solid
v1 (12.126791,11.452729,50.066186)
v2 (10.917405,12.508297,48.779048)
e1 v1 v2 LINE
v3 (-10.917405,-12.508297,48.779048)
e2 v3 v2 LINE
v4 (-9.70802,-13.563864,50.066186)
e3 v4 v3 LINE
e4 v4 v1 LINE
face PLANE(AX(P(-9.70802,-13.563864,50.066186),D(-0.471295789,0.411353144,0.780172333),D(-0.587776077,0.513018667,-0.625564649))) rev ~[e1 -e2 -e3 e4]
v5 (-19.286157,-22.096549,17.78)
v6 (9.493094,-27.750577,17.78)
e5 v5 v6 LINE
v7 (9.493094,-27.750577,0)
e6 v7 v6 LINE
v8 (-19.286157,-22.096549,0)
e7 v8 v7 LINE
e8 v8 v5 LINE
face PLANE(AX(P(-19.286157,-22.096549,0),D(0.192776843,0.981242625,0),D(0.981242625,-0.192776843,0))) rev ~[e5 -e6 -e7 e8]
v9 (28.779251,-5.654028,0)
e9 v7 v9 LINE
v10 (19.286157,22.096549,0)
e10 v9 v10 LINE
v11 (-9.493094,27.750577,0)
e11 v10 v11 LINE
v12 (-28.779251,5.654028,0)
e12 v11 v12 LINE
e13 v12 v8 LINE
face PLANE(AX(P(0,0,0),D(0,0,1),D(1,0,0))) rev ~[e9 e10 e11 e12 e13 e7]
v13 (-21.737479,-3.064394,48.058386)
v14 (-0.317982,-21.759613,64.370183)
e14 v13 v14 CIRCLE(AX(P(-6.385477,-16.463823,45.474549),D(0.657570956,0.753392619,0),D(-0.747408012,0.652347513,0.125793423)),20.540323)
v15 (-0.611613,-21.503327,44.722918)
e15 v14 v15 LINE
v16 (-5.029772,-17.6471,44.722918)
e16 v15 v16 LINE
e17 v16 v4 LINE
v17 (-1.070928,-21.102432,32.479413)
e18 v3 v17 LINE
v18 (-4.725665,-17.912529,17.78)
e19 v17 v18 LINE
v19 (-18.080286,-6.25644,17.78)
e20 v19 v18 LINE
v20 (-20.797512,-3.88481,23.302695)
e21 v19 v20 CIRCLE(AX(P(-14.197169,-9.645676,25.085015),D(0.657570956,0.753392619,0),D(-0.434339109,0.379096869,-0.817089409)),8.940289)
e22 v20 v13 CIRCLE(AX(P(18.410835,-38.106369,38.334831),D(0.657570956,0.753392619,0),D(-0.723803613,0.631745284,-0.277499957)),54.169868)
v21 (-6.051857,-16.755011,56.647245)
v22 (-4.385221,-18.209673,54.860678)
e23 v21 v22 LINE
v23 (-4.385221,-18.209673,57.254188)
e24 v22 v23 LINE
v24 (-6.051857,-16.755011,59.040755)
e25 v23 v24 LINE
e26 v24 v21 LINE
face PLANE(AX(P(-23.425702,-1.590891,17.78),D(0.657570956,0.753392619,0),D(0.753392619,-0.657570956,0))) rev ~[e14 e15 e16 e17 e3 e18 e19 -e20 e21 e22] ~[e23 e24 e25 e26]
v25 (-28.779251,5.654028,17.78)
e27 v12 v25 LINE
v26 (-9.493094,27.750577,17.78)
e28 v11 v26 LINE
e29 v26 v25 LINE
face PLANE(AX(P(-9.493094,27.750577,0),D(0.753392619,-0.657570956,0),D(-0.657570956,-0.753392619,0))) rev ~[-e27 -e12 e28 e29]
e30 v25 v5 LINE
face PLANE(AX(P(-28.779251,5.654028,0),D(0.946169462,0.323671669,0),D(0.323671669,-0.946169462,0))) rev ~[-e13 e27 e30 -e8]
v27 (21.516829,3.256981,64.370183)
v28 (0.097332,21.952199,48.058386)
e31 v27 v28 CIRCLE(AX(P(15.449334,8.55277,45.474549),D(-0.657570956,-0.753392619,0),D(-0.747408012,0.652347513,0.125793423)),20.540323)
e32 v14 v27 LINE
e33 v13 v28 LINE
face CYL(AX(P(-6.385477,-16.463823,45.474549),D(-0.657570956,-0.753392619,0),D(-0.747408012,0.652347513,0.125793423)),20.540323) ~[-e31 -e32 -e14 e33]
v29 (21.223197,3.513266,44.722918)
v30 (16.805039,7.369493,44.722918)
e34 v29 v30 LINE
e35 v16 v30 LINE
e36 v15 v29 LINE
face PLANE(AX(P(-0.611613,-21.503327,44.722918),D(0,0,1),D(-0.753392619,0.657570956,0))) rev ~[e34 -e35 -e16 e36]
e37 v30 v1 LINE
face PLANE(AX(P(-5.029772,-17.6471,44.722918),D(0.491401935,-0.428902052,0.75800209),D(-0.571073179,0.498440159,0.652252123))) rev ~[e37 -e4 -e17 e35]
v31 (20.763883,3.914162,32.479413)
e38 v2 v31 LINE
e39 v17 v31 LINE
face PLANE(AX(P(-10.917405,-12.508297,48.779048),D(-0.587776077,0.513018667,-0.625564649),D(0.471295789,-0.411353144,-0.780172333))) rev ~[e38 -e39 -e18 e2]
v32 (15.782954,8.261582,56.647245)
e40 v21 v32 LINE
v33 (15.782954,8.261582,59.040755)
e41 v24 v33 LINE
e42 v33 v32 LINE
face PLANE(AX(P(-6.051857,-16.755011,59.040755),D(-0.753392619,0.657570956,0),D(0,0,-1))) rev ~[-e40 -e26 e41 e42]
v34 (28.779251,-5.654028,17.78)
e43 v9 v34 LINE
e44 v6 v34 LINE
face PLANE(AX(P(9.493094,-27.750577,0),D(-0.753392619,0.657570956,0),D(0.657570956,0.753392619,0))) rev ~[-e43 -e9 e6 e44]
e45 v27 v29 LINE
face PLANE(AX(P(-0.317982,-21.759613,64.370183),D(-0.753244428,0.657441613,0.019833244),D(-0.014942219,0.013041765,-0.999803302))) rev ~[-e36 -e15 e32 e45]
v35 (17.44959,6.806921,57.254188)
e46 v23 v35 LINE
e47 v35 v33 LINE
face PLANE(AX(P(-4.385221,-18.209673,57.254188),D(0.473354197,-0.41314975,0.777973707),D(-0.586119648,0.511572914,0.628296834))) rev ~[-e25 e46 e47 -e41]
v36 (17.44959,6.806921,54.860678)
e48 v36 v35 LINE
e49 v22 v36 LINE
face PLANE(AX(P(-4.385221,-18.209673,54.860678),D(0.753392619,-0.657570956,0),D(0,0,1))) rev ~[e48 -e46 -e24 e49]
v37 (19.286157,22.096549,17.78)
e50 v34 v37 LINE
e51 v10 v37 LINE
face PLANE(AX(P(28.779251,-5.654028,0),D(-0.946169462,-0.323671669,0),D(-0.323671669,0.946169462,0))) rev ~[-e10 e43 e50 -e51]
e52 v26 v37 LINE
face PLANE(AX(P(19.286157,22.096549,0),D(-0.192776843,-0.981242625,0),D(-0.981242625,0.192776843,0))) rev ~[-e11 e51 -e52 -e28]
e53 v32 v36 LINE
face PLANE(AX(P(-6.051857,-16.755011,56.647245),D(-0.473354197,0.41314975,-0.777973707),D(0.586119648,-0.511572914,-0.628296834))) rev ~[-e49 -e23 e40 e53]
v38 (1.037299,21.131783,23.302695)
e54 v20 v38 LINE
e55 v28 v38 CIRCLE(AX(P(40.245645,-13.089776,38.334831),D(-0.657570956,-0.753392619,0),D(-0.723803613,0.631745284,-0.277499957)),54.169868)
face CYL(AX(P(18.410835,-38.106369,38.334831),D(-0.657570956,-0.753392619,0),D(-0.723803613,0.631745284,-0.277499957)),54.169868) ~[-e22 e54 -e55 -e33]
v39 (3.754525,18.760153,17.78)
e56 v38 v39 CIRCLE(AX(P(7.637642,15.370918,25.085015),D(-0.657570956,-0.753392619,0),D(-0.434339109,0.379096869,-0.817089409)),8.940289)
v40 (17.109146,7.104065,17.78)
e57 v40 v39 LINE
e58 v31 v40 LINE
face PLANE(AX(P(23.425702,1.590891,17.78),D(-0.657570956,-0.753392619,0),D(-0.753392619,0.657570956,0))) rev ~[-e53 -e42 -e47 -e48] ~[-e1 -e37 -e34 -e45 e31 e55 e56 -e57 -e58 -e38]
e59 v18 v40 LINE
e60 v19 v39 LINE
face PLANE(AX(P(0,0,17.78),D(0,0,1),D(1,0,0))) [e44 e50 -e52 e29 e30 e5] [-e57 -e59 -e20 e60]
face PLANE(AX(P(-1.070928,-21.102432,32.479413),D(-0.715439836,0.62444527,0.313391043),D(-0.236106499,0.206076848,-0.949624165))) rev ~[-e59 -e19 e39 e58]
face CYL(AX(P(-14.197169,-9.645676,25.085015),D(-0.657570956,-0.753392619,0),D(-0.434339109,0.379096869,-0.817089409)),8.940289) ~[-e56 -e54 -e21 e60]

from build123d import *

# Parameters (mm, degrees)
F1_DEPTH = 17.78
F3_DEPTH = 50.8
F5_DEPTH = 76.2
F7_DEPTH = 177.8
F8_DEPTH = 177.8


# Not quite as in the source:
# - a feature names something its author has since deleted; it is built from what else it names


with BuildPart() as f1:
    # F0 (on Top) → F1 (new body)
    with BuildSketch(Plane.XY):
        Polygon((-9.4930937983, 27.7505766331), (-28.7792512331, 5.6540279267), (-19.2861574348, -22.0965487064), (9.4930937983, -27.7505766331), (28.7792512331, -5.6540279267), (19.2861574348, 22.0965487064), align=None)
    extrude(amount=F1_DEPTH)

    # F2 (on face) → F3 (join)
    with BuildSketch(Plane.XY.offset(17.78)):
        Polygon((-1.5908913392, 23.4257021287), (-23.4257021287, -1.5908913392), (1.5908913392, -23.4257021287), (23.4257021287, 1.5908913392), align=None)
    extrude(amount=F3_DEPTH)

    # F4 (on face) → F5 (cut)
    with BuildSketch(Plane(origin=(-10.9174053947, -12.508296734, 0), x_dir=(0.7533926187, -0.6575709559, 0), z_dir=(-0.6575709559, -0.7533926187, 0))):
        with BuildLine():
            Line((0, 48.7790480256), (13.0695169792, 32.4794128537))
            Line((13.0695169792, 32.4794128537), (8.2184774801, 17.78))
            Line((8.2184774801, 17.78), (16.6026271336, 17.78))
            Line((16.6026271336, 17.78), (16.6026271336, 68.58))
            Line((16.6026271336, 68.58), (-16.6026271336, 68.58))
            Line((-16.6026271336, 68.58), (-16.6026271336, 17.78))
            Line((-16.6026271336, 17.78), (-9.5075005665, 17.78))
            ThreePointArc((-9.5075005665, 17.78), (-11.8387691089, 20.1965691968), (-13.1141533635, 23.3026945488))
            ThreePointArc((-13.1141533635, 23.3026945488), (-15.1729749394, 35.6082188112), (-14.361799588, 48.0583862079))
            ThreePointArc((-14.361799588, 48.0583862079), (-4.2065001242, 63.2907896054), (14.0689240854, 64.3701831512))
            Line((14.0689240854, 64.3701831512), (13.6791784316, 44.722918421))
            Line((13.6791784316, 44.722918421), (7.8148273751, 44.722918421))
            Line((7.8148273751, 44.722918421), (1.6052529907, 50.0661861116))
            Line((1.6052529907, 50.0661861116), (0, 48.7790480256))
        make_face()
    extrude(amount=-F5_DEPTH, mode=Mode.SUBTRACT)

    # F6 (on face) → F7 (cut)
    with BuildSketch(Plane(origin=(-10.9174053947, -12.508296734, 0), x_dir=(0.7533926187, -0.6575709559, 0), z_dir=(-0.6575709559, -0.7533926187, 0))):
        Polygon((8.6703589186, 57.2541877627), (6.4581842162, 59.0407550335), (6.4581842162, 56.6472448409), (8.6703589186, 54.8606775701), align=None)
    extrude(amount=-F7_DEPTH, mode=Mode.SUBTRACT)

    # F6 (on face) → F8 (cut)
    with BuildSketch(Plane(origin=(-10.9174053947, -12.508296734, 0), x_dir=(0.7533926187, -0.6575709559, 0), z_dir=(-0.6575709559, -0.7533926187, 0))):
        Polygon((8.6703589186, 57.2541877627), (6.4581842162, 59.0407550335), (6.4581842162, 56.6472448409), (8.6703589186, 54.8606775701), align=None)
    extrude(amount=-F8_DEPTH, mode=Mode.SUBTRACT)


solid = f1.part
